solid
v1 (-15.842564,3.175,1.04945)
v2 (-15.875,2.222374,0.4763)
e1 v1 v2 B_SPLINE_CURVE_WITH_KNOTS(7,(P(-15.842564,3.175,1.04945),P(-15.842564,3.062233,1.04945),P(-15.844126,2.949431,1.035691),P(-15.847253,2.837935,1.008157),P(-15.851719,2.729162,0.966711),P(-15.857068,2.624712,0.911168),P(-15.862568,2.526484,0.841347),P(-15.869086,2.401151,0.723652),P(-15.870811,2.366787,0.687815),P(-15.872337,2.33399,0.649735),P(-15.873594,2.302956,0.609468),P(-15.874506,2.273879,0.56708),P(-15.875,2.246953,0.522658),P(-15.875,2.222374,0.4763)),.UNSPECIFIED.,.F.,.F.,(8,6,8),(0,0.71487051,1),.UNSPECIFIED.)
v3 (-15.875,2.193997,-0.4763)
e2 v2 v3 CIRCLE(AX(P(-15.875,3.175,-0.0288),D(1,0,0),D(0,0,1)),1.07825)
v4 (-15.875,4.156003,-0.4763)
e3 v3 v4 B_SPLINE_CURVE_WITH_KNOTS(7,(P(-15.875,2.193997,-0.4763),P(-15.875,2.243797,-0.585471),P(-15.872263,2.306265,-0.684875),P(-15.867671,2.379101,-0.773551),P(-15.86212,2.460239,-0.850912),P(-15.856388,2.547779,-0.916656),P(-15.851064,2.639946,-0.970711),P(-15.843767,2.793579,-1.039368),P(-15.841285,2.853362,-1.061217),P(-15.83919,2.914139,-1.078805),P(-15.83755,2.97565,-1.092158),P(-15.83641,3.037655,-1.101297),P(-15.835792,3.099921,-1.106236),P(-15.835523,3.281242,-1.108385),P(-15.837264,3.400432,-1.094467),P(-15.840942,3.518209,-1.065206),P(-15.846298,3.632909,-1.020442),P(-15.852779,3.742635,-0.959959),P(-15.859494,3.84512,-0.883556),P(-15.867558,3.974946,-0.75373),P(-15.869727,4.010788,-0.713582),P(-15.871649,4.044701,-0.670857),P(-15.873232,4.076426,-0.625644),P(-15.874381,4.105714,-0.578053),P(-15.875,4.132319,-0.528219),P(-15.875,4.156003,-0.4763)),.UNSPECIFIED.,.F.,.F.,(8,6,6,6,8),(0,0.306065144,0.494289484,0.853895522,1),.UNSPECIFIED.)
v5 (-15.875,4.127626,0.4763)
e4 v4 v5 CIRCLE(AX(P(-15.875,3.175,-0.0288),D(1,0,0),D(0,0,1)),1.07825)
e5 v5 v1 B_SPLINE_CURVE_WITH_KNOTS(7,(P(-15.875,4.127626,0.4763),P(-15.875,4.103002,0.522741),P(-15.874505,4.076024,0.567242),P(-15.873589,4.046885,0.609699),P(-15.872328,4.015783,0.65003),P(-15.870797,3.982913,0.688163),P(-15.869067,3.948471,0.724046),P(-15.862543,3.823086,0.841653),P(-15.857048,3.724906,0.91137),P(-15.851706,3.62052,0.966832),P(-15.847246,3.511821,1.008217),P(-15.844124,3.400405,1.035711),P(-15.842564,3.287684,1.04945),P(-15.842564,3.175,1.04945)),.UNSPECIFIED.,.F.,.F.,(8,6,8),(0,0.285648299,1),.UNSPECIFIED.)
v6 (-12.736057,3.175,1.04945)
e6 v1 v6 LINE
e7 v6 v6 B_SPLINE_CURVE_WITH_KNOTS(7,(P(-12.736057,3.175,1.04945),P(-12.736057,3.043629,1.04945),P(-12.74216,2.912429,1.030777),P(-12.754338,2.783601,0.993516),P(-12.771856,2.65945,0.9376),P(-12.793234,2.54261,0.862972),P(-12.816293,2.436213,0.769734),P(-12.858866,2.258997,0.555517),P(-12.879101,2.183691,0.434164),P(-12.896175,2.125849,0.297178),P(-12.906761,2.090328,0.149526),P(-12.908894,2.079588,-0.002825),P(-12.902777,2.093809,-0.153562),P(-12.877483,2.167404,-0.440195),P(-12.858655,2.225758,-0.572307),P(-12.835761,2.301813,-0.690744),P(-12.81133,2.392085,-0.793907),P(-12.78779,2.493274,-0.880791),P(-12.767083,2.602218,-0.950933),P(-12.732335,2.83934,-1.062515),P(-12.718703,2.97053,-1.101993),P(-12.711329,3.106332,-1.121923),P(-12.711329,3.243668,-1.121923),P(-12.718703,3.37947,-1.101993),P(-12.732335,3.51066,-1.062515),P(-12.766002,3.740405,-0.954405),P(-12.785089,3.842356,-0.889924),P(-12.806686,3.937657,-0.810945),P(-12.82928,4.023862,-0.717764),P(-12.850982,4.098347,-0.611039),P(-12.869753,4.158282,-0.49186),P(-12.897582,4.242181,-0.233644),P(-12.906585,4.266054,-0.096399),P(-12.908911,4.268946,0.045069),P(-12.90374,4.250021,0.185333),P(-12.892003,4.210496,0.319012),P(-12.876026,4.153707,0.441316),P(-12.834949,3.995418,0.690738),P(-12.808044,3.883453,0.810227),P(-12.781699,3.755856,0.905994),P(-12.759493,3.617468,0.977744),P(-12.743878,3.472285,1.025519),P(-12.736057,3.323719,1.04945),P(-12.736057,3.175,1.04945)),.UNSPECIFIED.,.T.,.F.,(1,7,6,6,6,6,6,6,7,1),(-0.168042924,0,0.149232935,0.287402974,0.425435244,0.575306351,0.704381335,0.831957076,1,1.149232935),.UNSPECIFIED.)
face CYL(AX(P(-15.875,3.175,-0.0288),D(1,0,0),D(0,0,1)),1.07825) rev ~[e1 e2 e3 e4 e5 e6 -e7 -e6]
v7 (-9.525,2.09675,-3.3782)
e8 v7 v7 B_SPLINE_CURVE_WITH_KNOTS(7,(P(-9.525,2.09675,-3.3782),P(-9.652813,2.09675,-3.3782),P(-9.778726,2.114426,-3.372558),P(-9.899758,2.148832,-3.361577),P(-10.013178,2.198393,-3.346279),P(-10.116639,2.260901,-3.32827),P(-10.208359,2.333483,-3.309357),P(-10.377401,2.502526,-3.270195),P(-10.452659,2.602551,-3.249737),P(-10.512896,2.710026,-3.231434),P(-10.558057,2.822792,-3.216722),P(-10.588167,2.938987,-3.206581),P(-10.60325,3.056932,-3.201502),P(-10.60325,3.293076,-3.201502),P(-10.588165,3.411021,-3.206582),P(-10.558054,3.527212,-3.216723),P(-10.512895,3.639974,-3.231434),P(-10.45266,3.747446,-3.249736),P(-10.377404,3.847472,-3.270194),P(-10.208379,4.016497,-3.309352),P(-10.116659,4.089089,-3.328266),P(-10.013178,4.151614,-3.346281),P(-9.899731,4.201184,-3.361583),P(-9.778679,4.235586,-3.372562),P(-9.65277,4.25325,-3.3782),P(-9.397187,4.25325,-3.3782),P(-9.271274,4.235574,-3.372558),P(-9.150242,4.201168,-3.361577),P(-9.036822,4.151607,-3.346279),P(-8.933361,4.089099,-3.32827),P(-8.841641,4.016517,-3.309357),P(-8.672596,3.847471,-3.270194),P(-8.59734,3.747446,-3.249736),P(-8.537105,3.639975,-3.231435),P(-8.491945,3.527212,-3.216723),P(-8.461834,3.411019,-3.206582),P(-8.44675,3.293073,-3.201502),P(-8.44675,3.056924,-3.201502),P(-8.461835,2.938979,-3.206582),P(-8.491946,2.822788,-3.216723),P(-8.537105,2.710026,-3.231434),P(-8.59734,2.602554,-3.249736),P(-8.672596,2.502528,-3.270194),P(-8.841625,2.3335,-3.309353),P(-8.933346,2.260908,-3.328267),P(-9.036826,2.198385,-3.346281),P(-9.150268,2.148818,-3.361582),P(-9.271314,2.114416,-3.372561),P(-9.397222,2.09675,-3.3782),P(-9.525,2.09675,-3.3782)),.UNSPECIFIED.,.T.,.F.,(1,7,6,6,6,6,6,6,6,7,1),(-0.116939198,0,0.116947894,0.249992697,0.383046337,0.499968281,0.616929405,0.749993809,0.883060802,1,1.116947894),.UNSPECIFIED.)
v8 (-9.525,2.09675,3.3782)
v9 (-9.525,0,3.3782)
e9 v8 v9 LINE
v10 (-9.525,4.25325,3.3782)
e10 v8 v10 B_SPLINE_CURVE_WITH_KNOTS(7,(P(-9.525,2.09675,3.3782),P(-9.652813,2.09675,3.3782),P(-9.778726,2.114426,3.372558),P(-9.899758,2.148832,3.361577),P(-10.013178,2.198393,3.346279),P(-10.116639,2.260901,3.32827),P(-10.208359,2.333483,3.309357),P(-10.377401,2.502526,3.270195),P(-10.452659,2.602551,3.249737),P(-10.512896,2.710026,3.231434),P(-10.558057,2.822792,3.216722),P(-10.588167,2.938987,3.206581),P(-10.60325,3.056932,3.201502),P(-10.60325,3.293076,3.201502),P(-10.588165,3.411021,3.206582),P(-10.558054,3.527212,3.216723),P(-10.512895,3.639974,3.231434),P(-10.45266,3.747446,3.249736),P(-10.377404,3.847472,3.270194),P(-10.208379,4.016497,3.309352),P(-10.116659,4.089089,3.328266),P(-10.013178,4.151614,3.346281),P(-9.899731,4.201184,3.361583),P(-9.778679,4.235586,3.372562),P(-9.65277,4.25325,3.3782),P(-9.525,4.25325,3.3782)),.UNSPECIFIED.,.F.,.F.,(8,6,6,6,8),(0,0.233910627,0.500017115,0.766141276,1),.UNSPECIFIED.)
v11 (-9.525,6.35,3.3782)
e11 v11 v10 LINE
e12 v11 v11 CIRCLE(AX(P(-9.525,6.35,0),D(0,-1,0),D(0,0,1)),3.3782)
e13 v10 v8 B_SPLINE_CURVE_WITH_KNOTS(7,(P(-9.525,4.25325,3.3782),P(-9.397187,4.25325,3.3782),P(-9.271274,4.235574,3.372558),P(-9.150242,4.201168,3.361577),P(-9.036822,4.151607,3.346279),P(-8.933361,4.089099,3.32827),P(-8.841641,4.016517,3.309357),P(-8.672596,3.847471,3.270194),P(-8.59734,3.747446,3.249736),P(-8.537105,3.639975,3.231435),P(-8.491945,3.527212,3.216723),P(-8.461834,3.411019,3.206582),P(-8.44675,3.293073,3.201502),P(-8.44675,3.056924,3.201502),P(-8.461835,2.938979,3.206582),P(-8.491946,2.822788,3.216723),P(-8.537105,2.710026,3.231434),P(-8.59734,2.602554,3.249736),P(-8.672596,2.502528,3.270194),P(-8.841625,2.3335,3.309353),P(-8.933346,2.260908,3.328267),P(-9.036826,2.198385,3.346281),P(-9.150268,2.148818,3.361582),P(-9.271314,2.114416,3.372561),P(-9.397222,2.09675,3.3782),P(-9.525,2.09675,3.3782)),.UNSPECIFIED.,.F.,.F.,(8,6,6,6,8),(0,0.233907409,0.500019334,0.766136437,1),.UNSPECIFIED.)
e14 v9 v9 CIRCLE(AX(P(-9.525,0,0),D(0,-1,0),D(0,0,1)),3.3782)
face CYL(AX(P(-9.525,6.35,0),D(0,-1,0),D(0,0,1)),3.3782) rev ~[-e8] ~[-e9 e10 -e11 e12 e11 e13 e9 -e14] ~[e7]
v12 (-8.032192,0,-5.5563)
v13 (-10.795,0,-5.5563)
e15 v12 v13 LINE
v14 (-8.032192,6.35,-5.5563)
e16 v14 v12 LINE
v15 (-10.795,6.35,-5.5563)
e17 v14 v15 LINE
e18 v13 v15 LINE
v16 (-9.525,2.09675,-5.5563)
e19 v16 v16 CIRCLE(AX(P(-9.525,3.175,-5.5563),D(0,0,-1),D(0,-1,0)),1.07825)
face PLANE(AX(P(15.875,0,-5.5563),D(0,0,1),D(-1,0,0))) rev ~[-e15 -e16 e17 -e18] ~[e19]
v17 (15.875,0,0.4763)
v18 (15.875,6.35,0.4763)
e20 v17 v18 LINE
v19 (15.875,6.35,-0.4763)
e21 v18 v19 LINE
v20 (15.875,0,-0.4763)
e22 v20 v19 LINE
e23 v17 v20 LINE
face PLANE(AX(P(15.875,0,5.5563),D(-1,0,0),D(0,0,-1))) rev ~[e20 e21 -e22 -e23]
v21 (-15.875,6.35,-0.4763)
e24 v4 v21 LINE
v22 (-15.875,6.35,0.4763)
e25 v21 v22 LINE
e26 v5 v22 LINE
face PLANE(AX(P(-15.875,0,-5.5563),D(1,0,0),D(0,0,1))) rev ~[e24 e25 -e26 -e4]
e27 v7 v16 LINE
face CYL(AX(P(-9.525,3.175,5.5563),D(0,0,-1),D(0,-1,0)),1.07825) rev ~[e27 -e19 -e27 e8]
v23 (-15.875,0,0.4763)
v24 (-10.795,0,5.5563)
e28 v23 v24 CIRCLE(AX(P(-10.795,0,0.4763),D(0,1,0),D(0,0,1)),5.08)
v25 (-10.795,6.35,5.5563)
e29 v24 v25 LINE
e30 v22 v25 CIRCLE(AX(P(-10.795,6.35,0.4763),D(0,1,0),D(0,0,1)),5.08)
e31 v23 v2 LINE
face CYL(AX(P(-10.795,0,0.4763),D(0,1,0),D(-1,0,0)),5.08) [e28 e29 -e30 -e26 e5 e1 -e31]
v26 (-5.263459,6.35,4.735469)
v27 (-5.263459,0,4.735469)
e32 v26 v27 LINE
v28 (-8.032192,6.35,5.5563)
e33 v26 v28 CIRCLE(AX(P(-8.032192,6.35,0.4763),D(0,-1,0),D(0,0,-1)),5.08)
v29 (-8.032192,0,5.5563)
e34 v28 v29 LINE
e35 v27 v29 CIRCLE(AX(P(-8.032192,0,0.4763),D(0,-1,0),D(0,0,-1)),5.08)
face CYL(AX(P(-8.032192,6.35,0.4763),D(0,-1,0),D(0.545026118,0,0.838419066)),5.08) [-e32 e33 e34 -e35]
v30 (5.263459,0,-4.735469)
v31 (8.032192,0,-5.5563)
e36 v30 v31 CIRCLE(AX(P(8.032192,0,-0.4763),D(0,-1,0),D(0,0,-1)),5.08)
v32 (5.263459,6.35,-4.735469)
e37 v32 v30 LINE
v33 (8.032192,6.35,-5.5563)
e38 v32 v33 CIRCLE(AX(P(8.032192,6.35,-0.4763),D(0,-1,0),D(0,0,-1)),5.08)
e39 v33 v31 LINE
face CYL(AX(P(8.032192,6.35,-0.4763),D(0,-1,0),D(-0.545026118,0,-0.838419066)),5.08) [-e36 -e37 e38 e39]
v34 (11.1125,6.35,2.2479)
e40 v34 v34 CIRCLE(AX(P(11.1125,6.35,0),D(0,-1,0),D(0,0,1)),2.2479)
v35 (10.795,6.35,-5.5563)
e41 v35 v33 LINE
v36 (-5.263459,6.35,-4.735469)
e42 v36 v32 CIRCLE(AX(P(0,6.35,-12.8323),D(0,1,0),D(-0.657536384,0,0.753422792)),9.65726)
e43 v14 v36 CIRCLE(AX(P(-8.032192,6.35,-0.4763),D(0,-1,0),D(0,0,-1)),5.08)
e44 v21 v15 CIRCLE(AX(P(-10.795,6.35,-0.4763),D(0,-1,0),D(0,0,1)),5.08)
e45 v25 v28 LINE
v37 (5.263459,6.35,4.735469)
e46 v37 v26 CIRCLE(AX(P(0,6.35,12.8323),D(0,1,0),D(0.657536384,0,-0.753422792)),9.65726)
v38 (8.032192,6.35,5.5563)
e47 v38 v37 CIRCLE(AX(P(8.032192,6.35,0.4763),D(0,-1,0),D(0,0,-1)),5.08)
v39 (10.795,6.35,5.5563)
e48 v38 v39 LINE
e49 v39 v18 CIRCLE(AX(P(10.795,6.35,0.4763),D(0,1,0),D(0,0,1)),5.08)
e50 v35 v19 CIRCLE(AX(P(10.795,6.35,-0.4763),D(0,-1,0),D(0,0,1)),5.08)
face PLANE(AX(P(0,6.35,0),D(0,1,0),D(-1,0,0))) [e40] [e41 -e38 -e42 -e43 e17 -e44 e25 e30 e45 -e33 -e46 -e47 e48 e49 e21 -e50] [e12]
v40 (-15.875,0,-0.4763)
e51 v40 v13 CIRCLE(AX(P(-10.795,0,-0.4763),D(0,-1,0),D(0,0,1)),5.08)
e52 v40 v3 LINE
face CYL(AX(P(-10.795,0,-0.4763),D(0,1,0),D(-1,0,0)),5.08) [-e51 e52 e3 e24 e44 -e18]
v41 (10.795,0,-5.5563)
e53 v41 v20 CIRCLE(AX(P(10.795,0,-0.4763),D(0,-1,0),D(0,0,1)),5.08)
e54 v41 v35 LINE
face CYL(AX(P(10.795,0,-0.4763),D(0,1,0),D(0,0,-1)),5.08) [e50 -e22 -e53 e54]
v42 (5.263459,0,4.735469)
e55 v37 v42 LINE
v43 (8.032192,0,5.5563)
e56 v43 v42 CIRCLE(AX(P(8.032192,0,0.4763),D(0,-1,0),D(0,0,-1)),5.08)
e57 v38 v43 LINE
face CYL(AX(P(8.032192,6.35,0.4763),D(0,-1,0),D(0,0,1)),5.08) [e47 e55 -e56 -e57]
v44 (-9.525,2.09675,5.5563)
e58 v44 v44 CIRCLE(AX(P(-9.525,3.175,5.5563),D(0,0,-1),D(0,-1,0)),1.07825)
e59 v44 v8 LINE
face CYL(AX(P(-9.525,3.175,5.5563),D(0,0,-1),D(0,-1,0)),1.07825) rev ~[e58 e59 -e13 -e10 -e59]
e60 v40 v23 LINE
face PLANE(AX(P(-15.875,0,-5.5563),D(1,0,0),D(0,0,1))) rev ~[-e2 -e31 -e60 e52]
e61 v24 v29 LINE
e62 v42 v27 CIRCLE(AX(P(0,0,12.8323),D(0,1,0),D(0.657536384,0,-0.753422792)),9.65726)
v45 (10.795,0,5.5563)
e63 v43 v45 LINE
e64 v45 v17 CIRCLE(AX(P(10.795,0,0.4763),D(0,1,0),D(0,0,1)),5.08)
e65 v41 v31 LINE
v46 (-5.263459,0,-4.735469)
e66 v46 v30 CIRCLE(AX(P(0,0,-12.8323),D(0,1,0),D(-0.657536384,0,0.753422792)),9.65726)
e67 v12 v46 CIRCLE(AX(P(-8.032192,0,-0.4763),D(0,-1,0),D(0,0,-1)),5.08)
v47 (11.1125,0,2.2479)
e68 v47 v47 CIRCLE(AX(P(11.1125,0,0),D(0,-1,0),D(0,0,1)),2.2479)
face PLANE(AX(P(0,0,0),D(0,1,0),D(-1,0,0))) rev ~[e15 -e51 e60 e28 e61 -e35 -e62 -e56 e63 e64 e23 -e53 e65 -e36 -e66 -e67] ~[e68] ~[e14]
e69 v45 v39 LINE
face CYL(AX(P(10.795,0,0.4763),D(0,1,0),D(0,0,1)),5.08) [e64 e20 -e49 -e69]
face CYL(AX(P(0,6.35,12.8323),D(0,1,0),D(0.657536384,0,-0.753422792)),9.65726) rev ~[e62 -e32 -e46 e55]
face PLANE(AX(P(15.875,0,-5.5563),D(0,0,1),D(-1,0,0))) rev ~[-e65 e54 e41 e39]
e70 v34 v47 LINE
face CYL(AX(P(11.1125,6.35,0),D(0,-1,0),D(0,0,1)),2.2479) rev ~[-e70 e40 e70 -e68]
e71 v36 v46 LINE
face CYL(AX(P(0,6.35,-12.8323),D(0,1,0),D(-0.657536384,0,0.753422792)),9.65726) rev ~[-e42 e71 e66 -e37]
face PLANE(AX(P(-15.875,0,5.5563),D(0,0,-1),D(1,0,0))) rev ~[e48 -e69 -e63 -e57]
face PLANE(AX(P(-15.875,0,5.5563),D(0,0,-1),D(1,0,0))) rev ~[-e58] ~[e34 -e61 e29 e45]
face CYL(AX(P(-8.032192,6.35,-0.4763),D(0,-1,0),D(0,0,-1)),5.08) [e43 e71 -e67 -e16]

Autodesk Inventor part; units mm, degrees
ref_plane "YZ Plane" through (0, 0, 0) normal (1, 0, 0) x (0, 1, 0)
ref_plane "XZ Plane" through (0, 0, 0) normal (0, 1, 0) x (-1, 0, 0)
ref_plane "XY Plane" through (0, 0, 0) normal (0, 0, 1) x (1, 0, 0)
sketch "Sketch1" plane through (0, 0, 0) normal (0, 1, 0) x (-1, 0, 0)
  line L0 (15.875, 5.5563) -> (-15.875, 5.5563)
  line L1 (-15.875, 5.5563) -> (-15.875, -5.5563)
  line L2 (-15.875, -5.5563) -> (15.875, -5.5563)
  line L3 (15.875, -5.5563) -> (15.875, 5.5563)
  point P0 (0, 0)
  dimension "d0" = 31.75
  dimension "d1" = 11.1125
extrude "Extrusion1" add sketch "Sketch1" along normal blind 6.35
sketch "Sketch2" plane through (0, 6.35, 0) normal (0, 1, 0) x (1, 0, 0)
  line L0 (15.875, -5.5563) -> (15.875, 5.5563) projected
  line L1 (15.875, 5.5563) -> (-15.875, 5.5563) projected
  point P0 (0, 0)
  point P1 (11.1125, 0)
  dimension "d4" = 4.7625
  dimension "d5" = 5.5563
hole "Hole1" at (11.1125, 6.35, 0) direction (0, -1, 0) diameter 4.4958 end through all clearance for "Flat Head Machine Screw (82)" size "#8" standard "Ansi Unified Screw Threads"
sketch "Sketch3" plane through (0, 6.35, 0) normal (0, 1, 0) x (1, 0, 0)
  line L0 (-15.875, 5.5563) -> (-15.875, -5.5563) projected
  line L1 (15.875, 5.5563) -> (-15.875, 5.5563) projected
  point P0 (0, 0)
  point P1 (-9.525, 0)
  dimension "d13" = 6.35
  dimension "d14" = 5.5563
hole "Hole2" at (-9.525, 6.35, 0) direction (0, -1, 0) diameter 6.7564 end through all clearance for "Flat Head Machine Screw (82)" size "1/4" standard "Ansi Unified Screw Threads"
fillet "Fillet1" radius 5.08 4 edges at (15.875, 3.175, -5.5563) (15.875, 3.175, 5.5563) (-15.875, 3.175, -5.5563) (-15.875, 3.175, 5.5563)
sketch "Sketch4" plane through (0, 6.35, 0) normal (0, 1, 0) x (1, 0, 0)
  line L0 (-10.795, -5.5563) -> (10.795, -5.5563) projected
  arc A0 (6.35, -5.5563) -> (-6.35, -5.5563) centre (0, -12.8323) ccw
  line L1 (10.795, 5.5563) -> (-10.795, 5.5563) projected
  arc A1 (-6.35, 5.5563) -> (6.35, 5.5563) centre (0, 12.8323) ccw
  point P0 (0, 0)
  dimension "d23" = 12.7
  dimension "d24" = 12.7
extrude "Extrusion2" cut sketch "Sketch4" against normal blind 6.35
fillet "Fillet2" radius 5.08 4 edges at (-6.35, 3.175, -5.5563) (6.35, 3.175, -5.5563) (-6.35, 3.175, 5.5563) (6.35, 3.175, 5.5563)
sketch "Sketch5" plane through (-10.795, 0, 5.5563) normal (0, 0, 1) x (1, 0, 0)
  line L0 (0, 6.35) -> (2.7628, 6.35) projected
  line L1 (-5.08, 6.35) -> (-5.08, 0) projected
  point P0 (10.795, 0)
  point P1 (1.27, 3.175)
  dimension "d28" = 3.175
  dimension "d29" = 6.35
hole "Hole3" at (-9.525, 3.175, 5.5563) direction (0, 0, -1) diameter 2.1565 end through all thread size "4-40 UNC" class "2B" standard "ANSI Unified Screw Threads"
sketch "Sketch6" plane through (-15.875, 0, -0.4763) normal (-1, 0, 0) x (0, 0, 1)
  line L0 (0, 6.35) -> (0.9525, 6.35) projected
  line L1 (-5.08, 6.35) -> (-5.08, 0) projected
  point P0 (0.4763, 0)
  point P1 (0.4474, 3.175)
  dimension "d37" = 3.175
  dimension "d38" = 5.5274
hole "Hole4" at (-15.875, 3.175, -0.0288) direction (1, 0, 0) diameter 2.1565 end up to surface thread size "4-40 UNC" class "2B" standard "ANSI Unified Screw Threads"
properties part number "Tube to TRB1 adapter"
